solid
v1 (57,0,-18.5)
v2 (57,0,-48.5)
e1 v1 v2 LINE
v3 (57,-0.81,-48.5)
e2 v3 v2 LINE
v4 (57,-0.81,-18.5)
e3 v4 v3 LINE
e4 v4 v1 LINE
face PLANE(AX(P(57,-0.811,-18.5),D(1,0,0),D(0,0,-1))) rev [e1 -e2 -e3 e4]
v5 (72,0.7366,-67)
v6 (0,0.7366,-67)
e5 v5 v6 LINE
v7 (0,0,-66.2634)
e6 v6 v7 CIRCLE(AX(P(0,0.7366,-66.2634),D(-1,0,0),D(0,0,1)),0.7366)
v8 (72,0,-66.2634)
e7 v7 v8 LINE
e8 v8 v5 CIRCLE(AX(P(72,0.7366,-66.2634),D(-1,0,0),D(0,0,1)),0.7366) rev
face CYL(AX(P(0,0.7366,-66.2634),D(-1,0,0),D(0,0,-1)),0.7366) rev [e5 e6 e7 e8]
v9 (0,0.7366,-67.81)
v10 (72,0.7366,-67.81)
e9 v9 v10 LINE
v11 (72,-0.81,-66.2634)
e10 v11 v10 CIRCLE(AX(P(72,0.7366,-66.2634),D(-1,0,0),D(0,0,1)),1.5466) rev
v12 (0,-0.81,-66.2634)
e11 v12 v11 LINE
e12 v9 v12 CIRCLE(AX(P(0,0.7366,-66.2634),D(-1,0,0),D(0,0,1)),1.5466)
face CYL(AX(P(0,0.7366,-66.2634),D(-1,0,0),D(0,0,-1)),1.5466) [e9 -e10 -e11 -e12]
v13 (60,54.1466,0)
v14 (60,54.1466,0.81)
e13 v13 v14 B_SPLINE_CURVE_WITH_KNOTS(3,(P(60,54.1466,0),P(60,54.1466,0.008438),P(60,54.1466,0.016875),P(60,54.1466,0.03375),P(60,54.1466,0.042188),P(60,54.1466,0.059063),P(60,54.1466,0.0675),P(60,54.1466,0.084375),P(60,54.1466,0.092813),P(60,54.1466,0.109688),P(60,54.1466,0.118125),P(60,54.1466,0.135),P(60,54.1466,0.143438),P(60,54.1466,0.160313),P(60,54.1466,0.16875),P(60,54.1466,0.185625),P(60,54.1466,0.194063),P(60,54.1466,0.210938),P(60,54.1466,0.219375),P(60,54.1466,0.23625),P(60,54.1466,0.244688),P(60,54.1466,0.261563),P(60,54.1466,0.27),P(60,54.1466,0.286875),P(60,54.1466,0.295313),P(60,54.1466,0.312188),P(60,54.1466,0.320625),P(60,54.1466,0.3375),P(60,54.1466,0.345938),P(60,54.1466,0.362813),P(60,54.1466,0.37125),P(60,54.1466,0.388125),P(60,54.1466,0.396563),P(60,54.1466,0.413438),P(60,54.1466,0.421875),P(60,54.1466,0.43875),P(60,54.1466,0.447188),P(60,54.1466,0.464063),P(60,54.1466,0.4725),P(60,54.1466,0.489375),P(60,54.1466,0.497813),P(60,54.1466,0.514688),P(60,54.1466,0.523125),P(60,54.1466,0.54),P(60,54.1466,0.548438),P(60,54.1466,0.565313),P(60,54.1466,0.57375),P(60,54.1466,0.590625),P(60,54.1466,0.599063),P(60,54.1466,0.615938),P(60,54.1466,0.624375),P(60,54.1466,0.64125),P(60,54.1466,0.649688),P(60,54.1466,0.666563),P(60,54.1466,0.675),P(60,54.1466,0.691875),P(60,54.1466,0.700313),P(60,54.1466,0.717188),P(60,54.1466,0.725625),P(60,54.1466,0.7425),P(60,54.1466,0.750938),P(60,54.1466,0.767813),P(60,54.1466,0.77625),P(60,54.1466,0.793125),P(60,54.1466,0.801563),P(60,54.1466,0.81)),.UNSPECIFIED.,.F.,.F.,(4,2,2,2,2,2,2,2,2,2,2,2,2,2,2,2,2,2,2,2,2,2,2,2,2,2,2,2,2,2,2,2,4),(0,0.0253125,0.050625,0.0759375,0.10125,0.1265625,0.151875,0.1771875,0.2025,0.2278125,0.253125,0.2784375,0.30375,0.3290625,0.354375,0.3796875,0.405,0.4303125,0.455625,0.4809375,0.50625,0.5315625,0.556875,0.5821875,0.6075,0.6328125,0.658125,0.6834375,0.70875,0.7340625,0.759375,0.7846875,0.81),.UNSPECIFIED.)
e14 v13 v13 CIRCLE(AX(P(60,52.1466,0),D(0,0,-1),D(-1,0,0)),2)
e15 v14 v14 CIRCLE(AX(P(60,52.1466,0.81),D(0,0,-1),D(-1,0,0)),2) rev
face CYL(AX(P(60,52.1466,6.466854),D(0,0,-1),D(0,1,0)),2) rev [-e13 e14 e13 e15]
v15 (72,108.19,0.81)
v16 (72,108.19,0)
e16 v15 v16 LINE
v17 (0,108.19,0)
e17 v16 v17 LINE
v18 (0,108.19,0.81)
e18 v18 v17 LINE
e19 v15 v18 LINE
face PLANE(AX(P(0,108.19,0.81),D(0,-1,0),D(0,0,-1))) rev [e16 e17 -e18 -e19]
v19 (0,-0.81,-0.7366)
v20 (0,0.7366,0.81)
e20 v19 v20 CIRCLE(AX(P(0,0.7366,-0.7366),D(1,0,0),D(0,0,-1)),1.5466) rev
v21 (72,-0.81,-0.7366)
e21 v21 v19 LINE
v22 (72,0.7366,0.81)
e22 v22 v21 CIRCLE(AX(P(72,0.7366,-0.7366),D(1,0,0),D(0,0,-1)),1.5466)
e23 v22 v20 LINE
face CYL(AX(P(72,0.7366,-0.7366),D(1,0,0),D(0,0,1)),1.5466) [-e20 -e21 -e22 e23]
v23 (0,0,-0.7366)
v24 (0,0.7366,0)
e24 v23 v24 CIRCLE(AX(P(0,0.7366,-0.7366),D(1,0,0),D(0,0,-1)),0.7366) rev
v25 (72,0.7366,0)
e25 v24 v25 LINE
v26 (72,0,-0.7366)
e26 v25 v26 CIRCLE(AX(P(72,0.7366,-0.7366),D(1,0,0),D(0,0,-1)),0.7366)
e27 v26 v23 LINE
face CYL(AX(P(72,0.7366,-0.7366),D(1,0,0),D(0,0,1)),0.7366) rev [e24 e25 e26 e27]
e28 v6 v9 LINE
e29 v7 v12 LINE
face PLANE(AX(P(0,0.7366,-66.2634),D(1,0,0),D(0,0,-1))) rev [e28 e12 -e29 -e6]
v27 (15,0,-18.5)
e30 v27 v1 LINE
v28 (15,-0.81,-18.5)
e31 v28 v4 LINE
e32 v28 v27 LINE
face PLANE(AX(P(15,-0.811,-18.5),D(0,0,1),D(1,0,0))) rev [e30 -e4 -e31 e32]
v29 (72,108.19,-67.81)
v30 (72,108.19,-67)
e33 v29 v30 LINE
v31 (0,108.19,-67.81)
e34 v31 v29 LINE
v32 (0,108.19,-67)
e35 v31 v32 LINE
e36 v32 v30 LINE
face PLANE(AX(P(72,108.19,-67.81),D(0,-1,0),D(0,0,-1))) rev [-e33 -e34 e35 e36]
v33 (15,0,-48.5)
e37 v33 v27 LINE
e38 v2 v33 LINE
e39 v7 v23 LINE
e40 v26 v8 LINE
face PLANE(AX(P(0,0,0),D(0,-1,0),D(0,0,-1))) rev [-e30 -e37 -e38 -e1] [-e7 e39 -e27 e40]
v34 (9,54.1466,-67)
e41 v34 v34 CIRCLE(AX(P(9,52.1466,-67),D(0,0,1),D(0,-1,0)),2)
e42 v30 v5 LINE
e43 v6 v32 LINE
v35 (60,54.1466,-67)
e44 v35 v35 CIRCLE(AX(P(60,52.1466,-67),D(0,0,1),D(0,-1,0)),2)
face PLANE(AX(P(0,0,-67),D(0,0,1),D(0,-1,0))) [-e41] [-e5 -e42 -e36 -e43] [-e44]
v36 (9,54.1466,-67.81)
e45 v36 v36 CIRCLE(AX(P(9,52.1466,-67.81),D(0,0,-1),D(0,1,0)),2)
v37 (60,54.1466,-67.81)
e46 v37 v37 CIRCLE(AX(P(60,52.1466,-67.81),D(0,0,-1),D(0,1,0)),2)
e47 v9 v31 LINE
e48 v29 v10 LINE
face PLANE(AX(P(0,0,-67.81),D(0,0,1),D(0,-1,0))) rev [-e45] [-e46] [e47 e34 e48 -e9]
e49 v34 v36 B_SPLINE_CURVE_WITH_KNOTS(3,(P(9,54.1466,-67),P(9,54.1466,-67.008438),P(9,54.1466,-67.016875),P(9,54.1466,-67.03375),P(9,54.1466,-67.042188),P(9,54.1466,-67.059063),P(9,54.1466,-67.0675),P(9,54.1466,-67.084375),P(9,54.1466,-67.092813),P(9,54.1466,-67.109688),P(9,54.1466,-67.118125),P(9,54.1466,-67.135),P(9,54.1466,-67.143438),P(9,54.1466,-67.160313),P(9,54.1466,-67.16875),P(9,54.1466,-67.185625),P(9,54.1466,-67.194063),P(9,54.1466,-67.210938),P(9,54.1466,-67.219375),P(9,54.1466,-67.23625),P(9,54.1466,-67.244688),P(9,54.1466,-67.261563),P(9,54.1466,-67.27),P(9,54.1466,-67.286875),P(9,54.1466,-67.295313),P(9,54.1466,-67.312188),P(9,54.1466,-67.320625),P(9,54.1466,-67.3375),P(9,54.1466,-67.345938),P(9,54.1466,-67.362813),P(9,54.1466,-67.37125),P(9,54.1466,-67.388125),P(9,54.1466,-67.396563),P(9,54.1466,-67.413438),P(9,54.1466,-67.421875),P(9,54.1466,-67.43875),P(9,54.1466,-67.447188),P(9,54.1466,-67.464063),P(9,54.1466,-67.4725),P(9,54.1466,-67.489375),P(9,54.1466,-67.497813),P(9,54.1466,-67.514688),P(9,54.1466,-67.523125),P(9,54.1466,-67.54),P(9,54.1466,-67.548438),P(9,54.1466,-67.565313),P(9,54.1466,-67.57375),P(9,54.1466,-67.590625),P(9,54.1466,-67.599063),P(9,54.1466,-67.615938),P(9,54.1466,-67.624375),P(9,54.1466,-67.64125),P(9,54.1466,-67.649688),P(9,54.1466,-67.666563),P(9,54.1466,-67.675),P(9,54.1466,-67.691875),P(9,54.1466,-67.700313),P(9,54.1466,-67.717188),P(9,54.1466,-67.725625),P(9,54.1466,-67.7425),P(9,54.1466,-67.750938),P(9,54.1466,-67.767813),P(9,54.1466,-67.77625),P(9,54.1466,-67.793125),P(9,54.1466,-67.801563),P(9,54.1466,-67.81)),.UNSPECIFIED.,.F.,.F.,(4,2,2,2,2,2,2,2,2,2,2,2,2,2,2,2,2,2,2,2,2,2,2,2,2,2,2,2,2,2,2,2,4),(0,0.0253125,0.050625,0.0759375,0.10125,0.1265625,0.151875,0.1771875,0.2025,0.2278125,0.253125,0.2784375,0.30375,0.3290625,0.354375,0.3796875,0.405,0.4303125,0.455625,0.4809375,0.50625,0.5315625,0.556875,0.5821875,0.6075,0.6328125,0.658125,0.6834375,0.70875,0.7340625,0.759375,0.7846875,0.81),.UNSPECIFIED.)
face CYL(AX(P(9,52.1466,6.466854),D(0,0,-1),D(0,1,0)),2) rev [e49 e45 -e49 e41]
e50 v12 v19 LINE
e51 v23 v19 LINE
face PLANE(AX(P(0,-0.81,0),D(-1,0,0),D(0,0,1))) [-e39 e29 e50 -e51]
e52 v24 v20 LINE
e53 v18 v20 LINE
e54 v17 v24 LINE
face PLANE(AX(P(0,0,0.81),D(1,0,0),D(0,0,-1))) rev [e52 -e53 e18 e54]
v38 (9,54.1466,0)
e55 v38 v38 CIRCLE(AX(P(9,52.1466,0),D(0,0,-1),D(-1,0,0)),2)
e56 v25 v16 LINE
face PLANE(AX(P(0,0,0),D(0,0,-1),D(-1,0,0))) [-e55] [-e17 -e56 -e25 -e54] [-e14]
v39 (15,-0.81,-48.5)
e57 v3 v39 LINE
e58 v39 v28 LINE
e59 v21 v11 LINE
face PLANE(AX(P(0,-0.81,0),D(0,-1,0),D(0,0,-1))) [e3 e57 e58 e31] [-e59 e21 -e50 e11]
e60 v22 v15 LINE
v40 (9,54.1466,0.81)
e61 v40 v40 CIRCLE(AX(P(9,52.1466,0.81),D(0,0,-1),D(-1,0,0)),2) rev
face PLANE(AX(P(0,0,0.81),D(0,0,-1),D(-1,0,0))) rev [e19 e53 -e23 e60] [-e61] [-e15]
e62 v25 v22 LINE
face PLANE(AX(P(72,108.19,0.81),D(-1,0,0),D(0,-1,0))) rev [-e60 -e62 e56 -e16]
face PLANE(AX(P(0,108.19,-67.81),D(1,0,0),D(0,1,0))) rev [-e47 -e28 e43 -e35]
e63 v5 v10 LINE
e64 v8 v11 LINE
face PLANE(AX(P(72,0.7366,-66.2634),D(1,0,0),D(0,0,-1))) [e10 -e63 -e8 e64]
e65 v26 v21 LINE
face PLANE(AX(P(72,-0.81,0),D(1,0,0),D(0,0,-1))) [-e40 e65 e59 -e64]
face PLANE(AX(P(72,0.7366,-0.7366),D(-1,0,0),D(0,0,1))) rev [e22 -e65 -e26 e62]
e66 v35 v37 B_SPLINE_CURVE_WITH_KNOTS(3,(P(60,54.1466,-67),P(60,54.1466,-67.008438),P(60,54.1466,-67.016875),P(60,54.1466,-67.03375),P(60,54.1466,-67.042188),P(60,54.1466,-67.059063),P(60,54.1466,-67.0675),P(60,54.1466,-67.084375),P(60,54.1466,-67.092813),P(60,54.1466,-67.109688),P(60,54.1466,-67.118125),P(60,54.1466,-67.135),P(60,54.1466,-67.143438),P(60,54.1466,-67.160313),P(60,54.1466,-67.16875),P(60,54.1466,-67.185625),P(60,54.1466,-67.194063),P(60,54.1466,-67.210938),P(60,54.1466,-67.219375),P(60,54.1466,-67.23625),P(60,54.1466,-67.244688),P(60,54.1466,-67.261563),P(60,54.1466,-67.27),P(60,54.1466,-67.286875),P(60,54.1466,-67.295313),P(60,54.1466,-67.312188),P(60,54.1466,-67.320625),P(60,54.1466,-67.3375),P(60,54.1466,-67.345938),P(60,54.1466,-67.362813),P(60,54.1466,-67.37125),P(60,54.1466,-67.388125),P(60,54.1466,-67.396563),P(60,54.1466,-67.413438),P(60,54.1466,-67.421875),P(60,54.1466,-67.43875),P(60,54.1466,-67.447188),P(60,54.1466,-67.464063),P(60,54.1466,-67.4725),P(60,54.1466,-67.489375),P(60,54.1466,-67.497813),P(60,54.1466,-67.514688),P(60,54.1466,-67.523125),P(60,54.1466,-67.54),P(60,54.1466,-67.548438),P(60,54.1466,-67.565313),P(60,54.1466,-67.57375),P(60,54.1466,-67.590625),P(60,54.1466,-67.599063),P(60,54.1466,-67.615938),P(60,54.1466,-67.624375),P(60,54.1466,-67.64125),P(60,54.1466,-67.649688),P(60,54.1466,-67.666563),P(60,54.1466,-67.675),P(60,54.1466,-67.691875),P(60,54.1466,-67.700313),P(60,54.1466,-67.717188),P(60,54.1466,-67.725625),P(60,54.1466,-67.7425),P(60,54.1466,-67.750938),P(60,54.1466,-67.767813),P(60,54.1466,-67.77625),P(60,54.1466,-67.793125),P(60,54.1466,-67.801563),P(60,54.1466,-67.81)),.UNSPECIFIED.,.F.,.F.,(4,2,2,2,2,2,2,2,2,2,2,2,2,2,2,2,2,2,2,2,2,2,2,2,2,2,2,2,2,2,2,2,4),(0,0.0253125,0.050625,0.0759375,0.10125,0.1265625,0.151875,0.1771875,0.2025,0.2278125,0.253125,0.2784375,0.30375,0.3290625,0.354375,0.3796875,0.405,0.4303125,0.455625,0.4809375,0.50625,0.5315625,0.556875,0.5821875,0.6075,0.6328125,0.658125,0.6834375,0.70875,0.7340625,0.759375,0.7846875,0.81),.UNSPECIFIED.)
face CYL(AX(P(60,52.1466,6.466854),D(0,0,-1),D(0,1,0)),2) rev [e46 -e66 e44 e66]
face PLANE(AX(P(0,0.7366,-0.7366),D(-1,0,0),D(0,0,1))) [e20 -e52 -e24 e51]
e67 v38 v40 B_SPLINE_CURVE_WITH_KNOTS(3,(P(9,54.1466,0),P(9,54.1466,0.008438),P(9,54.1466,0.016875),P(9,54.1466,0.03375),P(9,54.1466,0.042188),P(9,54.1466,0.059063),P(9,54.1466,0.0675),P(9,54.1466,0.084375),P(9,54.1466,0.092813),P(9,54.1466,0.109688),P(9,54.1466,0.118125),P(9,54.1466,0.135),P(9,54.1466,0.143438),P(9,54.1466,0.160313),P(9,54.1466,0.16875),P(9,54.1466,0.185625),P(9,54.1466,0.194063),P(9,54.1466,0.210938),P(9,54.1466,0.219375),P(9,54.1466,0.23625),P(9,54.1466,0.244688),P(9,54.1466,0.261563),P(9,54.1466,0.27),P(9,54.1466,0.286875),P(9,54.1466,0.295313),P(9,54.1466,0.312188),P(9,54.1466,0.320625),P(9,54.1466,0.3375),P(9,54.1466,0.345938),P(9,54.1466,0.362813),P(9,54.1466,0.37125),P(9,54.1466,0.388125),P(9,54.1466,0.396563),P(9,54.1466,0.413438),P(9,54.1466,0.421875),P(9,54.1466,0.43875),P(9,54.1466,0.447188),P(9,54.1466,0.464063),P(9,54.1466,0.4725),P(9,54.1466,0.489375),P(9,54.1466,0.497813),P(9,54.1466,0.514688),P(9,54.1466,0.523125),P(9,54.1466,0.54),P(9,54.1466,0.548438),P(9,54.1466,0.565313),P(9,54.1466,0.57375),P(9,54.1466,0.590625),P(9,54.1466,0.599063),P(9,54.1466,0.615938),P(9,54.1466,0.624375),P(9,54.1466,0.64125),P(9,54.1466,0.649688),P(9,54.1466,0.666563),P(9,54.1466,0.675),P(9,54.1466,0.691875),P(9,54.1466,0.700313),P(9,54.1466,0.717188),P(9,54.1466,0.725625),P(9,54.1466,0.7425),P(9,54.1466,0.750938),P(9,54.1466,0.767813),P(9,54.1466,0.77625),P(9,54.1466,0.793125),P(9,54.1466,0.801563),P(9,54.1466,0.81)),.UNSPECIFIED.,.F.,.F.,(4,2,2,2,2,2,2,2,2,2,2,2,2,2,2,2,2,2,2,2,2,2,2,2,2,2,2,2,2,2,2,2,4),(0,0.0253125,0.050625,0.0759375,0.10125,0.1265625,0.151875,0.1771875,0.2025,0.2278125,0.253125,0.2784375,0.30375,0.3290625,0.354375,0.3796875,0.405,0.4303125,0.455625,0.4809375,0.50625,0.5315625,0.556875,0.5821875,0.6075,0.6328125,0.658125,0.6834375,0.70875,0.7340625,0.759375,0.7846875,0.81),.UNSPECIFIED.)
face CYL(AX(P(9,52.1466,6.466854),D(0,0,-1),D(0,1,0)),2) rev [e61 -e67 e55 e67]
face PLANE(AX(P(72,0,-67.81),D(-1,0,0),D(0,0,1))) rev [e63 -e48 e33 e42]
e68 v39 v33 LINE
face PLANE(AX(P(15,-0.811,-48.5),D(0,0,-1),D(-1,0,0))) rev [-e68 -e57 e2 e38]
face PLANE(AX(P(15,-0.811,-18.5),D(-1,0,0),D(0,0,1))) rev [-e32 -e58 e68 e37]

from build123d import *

# Parameters (mm, degrees)
SKETCH1_W                      = 72
SKETCH1_H                      = 67
BASE_FLANGE1_DEPTH             = 0.81
EDGE_FLANGE1_STRIP_W           = 4.7132
EDGE_FLANGE1_STRIP_H           = 0.81
EDGE_FLANGE1_STRIP_CUT_DEPTH   = 72
EDGE_FLANGE1_STRIP_2_W         = 4.7132
EDGE_FLANGE1_STRIP_2_H         = 0.81
EDGE_FLANGE1_STRIP_CUT_2_DEPTH = 72
EDGE_FLANGE1_DEPTH             = 72
EDGE_FLANGE1_BEND_DEPTH        = 72
CUT_EXTRUDE1_REACH             = 148.585
SKETCH12_W                     = 42
SKETCH12_H                     = 30
CUT_EXTRUDE2_REACH             = 148.962
SKETCH13_R                     = 2


# Sheet-metal steps are written as plain solids
with BuildPart() as part:
    # Sketch1 → Base-Flange1 (new body)
    with BuildSketch(Plane(origin=(0, 0, 0), x_dir=(1, 0, 0), z_dir=(0, 1, 0))):
        with Locations((36, 33.5)):
            Rectangle(SKETCH1_W, SKETCH1_H)
    extrude(amount=-BASE_FLANGE1_DEPTH)

    # Edge-Flange1 strip (across the edge) → Edge-Flange1 strip cut (cut)
    with BuildSketch(Plane(origin=(0, 0, 0), x_dir=(0, 0, -1), z_dir=(1, 0, 0))):
        with Locations((-1.62, -0.405)):
            Rectangle(EDGE_FLANGE1_STRIP_W, EDGE_FLANGE1_STRIP_H)
    extrude(amount=EDGE_FLANGE1_STRIP_CUT_DEPTH, mode=Mode.SUBTRACT)

    # Edge-Flange1 strip 2 (across the edge) → Edge-Flange1 strip cut 2 (cut)
    with BuildSketch(Plane(origin=(72, 0, -67), x_dir=(0, 0, 1), z_dir=(-1, 0, 0))):
        with Locations((-1.62, -0.405)):
            Rectangle(EDGE_FLANGE1_STRIP_2_W, EDGE_FLANGE1_STRIP_2_H)
    extrude(amount=EDGE_FLANGE1_STRIP_CUT_2_DEPTH, mode=Mode.SUBTRACT)

    # Edge-Flange1 section (across the edge) → Edge-Flange1 (add)
    with BuildSketch(Plane(origin=(0, 0, 0), x_dir=(0, 0, -1), z_dir=(1, 0, 0))):
        with BuildLine():
            Line((-0.81, 0.7366), (-0.81, 108.19))
            Line((-0.81, 108.19), (0, 108.19))
            Line((0, 108.19), (0, 0.7366))
            ThreePointArc((0, 0.7366), (0.215745145, 0.215745145), (0.7366, 0))
            Line((0.7366, 0), (0.7366, -0.81))
            ThreePointArc((0.7366, -0.81), (-0.357011348, -0.357011348), (-0.81, 0.7366))
        make_face()
    extrude(amount=EDGE_FLANGE1_DEPTH)

    # Edge-Flange1 section 2 (across the edge) → Edge-Flange1 bend (add)
    with BuildSketch(Plane(origin=(72, 0, -67), x_dir=(0, 0, 1), z_dir=(-1, 0, 0))):
        with BuildLine():
            Line((-0.81, 0.7366), (-0.81, 108.19))
            Line((-0.81, 108.19), (0, 108.19))
            Line((0, 108.19), (0, 0.7366))
            ThreePointArc((0, 0.7366), (0.215745145, 0.215745145), (0.7366, 0))
            Line((0.7366, 0), (0.7366, -0.81))
            ThreePointArc((0.7366, -0.81), (-0.357011348, -0.357011348), (-0.81, 0.7366))
        make_face()
    extrude(amount=EDGE_FLANGE1_BEND_DEPTH)

    # Sketch12 → Cut-Extrude1 (cut, up to next)
    with BuildSketch(Plane(origin=(0, 0, 0), x_dir=(1, 0, 0), z_dir=(0, 1, 0)), mode=Mode.PRIVATE) as cut_extrude1_sk1:
        with Locations((36, 33.5)):
            Rectangle(SKETCH12_W, SKETCH12_H)
    cut_extrude1_tool1 = extrude(cut_extrude1_sk1.sketch, amount=-CUT_EXTRUDE1_REACH, mode=Mode.PRIVATE) & part.part
    add(cut_extrude1_tool1.solids().sort_by_distance((36, 0, -33.5))[0], mode=Mode.SUBTRACT)

    # Cut-Extrude2: up to this face of the body (flat: up to its plane)
    cut_extrude2_end = Plane(part.part.faces().sort_by_distance((36, 54.4633, 0.81))[0])
    # Sketch13 → Cut-Extrude2 (cut, up to the picked face)
    with BuildSketch(Plane(origin=(0, 0, -67.81), x_dir=(-1, 0, 0), z_dir=(0, 0, -1)), mode=Mode.PRIVATE) as cut_extrude2_sk1:
        with Locations(Location((-9, 52.1466, 0), (0, 0, 90))):
            Circle(SKETCH13_R)
    cut_extrude2_tool1 = split(extrude(cut_extrude2_sk1.sketch, amount=-CUT_EXTRUDE2_REACH, mode=Mode.PRIVATE), bisect_by=cut_extrude2_end, keep=Keep.BOTH, mode=Mode.PRIVATE)
    # Sketch13 → Cut-Extrude2 (cut, up to the picked face)
    with BuildSketch(Plane(origin=(0, 0, -67.81), x_dir=(-1, 0, 0), z_dir=(0, 0, -1)), mode=Mode.PRIVATE) as cut_extrude2_sk2:
        with Locations(Location((-60, 52.1466, 0), (0, 0, 90))):
            Circle(SKETCH13_R)
    cut_extrude2_tool2 = split(extrude(cut_extrude2_sk2.sketch, amount=-CUT_EXTRUDE2_REACH, mode=Mode.PRIVATE), bisect_by=cut_extrude2_end, keep=Keep.BOTH, mode=Mode.PRIVATE)
    add(cut_extrude2_tool1.solids().sort_by(Axis((9, 52.1466, -67.81), (0, 0, 1)))[0], mode=Mode.SUBTRACT)
    add(cut_extrude2_tool2.solids().sort_by(Axis((60, 52.1466, -67.81), (0, 0, 1)))[0], mode=Mode.SUBTRACT)


solid = part.part
